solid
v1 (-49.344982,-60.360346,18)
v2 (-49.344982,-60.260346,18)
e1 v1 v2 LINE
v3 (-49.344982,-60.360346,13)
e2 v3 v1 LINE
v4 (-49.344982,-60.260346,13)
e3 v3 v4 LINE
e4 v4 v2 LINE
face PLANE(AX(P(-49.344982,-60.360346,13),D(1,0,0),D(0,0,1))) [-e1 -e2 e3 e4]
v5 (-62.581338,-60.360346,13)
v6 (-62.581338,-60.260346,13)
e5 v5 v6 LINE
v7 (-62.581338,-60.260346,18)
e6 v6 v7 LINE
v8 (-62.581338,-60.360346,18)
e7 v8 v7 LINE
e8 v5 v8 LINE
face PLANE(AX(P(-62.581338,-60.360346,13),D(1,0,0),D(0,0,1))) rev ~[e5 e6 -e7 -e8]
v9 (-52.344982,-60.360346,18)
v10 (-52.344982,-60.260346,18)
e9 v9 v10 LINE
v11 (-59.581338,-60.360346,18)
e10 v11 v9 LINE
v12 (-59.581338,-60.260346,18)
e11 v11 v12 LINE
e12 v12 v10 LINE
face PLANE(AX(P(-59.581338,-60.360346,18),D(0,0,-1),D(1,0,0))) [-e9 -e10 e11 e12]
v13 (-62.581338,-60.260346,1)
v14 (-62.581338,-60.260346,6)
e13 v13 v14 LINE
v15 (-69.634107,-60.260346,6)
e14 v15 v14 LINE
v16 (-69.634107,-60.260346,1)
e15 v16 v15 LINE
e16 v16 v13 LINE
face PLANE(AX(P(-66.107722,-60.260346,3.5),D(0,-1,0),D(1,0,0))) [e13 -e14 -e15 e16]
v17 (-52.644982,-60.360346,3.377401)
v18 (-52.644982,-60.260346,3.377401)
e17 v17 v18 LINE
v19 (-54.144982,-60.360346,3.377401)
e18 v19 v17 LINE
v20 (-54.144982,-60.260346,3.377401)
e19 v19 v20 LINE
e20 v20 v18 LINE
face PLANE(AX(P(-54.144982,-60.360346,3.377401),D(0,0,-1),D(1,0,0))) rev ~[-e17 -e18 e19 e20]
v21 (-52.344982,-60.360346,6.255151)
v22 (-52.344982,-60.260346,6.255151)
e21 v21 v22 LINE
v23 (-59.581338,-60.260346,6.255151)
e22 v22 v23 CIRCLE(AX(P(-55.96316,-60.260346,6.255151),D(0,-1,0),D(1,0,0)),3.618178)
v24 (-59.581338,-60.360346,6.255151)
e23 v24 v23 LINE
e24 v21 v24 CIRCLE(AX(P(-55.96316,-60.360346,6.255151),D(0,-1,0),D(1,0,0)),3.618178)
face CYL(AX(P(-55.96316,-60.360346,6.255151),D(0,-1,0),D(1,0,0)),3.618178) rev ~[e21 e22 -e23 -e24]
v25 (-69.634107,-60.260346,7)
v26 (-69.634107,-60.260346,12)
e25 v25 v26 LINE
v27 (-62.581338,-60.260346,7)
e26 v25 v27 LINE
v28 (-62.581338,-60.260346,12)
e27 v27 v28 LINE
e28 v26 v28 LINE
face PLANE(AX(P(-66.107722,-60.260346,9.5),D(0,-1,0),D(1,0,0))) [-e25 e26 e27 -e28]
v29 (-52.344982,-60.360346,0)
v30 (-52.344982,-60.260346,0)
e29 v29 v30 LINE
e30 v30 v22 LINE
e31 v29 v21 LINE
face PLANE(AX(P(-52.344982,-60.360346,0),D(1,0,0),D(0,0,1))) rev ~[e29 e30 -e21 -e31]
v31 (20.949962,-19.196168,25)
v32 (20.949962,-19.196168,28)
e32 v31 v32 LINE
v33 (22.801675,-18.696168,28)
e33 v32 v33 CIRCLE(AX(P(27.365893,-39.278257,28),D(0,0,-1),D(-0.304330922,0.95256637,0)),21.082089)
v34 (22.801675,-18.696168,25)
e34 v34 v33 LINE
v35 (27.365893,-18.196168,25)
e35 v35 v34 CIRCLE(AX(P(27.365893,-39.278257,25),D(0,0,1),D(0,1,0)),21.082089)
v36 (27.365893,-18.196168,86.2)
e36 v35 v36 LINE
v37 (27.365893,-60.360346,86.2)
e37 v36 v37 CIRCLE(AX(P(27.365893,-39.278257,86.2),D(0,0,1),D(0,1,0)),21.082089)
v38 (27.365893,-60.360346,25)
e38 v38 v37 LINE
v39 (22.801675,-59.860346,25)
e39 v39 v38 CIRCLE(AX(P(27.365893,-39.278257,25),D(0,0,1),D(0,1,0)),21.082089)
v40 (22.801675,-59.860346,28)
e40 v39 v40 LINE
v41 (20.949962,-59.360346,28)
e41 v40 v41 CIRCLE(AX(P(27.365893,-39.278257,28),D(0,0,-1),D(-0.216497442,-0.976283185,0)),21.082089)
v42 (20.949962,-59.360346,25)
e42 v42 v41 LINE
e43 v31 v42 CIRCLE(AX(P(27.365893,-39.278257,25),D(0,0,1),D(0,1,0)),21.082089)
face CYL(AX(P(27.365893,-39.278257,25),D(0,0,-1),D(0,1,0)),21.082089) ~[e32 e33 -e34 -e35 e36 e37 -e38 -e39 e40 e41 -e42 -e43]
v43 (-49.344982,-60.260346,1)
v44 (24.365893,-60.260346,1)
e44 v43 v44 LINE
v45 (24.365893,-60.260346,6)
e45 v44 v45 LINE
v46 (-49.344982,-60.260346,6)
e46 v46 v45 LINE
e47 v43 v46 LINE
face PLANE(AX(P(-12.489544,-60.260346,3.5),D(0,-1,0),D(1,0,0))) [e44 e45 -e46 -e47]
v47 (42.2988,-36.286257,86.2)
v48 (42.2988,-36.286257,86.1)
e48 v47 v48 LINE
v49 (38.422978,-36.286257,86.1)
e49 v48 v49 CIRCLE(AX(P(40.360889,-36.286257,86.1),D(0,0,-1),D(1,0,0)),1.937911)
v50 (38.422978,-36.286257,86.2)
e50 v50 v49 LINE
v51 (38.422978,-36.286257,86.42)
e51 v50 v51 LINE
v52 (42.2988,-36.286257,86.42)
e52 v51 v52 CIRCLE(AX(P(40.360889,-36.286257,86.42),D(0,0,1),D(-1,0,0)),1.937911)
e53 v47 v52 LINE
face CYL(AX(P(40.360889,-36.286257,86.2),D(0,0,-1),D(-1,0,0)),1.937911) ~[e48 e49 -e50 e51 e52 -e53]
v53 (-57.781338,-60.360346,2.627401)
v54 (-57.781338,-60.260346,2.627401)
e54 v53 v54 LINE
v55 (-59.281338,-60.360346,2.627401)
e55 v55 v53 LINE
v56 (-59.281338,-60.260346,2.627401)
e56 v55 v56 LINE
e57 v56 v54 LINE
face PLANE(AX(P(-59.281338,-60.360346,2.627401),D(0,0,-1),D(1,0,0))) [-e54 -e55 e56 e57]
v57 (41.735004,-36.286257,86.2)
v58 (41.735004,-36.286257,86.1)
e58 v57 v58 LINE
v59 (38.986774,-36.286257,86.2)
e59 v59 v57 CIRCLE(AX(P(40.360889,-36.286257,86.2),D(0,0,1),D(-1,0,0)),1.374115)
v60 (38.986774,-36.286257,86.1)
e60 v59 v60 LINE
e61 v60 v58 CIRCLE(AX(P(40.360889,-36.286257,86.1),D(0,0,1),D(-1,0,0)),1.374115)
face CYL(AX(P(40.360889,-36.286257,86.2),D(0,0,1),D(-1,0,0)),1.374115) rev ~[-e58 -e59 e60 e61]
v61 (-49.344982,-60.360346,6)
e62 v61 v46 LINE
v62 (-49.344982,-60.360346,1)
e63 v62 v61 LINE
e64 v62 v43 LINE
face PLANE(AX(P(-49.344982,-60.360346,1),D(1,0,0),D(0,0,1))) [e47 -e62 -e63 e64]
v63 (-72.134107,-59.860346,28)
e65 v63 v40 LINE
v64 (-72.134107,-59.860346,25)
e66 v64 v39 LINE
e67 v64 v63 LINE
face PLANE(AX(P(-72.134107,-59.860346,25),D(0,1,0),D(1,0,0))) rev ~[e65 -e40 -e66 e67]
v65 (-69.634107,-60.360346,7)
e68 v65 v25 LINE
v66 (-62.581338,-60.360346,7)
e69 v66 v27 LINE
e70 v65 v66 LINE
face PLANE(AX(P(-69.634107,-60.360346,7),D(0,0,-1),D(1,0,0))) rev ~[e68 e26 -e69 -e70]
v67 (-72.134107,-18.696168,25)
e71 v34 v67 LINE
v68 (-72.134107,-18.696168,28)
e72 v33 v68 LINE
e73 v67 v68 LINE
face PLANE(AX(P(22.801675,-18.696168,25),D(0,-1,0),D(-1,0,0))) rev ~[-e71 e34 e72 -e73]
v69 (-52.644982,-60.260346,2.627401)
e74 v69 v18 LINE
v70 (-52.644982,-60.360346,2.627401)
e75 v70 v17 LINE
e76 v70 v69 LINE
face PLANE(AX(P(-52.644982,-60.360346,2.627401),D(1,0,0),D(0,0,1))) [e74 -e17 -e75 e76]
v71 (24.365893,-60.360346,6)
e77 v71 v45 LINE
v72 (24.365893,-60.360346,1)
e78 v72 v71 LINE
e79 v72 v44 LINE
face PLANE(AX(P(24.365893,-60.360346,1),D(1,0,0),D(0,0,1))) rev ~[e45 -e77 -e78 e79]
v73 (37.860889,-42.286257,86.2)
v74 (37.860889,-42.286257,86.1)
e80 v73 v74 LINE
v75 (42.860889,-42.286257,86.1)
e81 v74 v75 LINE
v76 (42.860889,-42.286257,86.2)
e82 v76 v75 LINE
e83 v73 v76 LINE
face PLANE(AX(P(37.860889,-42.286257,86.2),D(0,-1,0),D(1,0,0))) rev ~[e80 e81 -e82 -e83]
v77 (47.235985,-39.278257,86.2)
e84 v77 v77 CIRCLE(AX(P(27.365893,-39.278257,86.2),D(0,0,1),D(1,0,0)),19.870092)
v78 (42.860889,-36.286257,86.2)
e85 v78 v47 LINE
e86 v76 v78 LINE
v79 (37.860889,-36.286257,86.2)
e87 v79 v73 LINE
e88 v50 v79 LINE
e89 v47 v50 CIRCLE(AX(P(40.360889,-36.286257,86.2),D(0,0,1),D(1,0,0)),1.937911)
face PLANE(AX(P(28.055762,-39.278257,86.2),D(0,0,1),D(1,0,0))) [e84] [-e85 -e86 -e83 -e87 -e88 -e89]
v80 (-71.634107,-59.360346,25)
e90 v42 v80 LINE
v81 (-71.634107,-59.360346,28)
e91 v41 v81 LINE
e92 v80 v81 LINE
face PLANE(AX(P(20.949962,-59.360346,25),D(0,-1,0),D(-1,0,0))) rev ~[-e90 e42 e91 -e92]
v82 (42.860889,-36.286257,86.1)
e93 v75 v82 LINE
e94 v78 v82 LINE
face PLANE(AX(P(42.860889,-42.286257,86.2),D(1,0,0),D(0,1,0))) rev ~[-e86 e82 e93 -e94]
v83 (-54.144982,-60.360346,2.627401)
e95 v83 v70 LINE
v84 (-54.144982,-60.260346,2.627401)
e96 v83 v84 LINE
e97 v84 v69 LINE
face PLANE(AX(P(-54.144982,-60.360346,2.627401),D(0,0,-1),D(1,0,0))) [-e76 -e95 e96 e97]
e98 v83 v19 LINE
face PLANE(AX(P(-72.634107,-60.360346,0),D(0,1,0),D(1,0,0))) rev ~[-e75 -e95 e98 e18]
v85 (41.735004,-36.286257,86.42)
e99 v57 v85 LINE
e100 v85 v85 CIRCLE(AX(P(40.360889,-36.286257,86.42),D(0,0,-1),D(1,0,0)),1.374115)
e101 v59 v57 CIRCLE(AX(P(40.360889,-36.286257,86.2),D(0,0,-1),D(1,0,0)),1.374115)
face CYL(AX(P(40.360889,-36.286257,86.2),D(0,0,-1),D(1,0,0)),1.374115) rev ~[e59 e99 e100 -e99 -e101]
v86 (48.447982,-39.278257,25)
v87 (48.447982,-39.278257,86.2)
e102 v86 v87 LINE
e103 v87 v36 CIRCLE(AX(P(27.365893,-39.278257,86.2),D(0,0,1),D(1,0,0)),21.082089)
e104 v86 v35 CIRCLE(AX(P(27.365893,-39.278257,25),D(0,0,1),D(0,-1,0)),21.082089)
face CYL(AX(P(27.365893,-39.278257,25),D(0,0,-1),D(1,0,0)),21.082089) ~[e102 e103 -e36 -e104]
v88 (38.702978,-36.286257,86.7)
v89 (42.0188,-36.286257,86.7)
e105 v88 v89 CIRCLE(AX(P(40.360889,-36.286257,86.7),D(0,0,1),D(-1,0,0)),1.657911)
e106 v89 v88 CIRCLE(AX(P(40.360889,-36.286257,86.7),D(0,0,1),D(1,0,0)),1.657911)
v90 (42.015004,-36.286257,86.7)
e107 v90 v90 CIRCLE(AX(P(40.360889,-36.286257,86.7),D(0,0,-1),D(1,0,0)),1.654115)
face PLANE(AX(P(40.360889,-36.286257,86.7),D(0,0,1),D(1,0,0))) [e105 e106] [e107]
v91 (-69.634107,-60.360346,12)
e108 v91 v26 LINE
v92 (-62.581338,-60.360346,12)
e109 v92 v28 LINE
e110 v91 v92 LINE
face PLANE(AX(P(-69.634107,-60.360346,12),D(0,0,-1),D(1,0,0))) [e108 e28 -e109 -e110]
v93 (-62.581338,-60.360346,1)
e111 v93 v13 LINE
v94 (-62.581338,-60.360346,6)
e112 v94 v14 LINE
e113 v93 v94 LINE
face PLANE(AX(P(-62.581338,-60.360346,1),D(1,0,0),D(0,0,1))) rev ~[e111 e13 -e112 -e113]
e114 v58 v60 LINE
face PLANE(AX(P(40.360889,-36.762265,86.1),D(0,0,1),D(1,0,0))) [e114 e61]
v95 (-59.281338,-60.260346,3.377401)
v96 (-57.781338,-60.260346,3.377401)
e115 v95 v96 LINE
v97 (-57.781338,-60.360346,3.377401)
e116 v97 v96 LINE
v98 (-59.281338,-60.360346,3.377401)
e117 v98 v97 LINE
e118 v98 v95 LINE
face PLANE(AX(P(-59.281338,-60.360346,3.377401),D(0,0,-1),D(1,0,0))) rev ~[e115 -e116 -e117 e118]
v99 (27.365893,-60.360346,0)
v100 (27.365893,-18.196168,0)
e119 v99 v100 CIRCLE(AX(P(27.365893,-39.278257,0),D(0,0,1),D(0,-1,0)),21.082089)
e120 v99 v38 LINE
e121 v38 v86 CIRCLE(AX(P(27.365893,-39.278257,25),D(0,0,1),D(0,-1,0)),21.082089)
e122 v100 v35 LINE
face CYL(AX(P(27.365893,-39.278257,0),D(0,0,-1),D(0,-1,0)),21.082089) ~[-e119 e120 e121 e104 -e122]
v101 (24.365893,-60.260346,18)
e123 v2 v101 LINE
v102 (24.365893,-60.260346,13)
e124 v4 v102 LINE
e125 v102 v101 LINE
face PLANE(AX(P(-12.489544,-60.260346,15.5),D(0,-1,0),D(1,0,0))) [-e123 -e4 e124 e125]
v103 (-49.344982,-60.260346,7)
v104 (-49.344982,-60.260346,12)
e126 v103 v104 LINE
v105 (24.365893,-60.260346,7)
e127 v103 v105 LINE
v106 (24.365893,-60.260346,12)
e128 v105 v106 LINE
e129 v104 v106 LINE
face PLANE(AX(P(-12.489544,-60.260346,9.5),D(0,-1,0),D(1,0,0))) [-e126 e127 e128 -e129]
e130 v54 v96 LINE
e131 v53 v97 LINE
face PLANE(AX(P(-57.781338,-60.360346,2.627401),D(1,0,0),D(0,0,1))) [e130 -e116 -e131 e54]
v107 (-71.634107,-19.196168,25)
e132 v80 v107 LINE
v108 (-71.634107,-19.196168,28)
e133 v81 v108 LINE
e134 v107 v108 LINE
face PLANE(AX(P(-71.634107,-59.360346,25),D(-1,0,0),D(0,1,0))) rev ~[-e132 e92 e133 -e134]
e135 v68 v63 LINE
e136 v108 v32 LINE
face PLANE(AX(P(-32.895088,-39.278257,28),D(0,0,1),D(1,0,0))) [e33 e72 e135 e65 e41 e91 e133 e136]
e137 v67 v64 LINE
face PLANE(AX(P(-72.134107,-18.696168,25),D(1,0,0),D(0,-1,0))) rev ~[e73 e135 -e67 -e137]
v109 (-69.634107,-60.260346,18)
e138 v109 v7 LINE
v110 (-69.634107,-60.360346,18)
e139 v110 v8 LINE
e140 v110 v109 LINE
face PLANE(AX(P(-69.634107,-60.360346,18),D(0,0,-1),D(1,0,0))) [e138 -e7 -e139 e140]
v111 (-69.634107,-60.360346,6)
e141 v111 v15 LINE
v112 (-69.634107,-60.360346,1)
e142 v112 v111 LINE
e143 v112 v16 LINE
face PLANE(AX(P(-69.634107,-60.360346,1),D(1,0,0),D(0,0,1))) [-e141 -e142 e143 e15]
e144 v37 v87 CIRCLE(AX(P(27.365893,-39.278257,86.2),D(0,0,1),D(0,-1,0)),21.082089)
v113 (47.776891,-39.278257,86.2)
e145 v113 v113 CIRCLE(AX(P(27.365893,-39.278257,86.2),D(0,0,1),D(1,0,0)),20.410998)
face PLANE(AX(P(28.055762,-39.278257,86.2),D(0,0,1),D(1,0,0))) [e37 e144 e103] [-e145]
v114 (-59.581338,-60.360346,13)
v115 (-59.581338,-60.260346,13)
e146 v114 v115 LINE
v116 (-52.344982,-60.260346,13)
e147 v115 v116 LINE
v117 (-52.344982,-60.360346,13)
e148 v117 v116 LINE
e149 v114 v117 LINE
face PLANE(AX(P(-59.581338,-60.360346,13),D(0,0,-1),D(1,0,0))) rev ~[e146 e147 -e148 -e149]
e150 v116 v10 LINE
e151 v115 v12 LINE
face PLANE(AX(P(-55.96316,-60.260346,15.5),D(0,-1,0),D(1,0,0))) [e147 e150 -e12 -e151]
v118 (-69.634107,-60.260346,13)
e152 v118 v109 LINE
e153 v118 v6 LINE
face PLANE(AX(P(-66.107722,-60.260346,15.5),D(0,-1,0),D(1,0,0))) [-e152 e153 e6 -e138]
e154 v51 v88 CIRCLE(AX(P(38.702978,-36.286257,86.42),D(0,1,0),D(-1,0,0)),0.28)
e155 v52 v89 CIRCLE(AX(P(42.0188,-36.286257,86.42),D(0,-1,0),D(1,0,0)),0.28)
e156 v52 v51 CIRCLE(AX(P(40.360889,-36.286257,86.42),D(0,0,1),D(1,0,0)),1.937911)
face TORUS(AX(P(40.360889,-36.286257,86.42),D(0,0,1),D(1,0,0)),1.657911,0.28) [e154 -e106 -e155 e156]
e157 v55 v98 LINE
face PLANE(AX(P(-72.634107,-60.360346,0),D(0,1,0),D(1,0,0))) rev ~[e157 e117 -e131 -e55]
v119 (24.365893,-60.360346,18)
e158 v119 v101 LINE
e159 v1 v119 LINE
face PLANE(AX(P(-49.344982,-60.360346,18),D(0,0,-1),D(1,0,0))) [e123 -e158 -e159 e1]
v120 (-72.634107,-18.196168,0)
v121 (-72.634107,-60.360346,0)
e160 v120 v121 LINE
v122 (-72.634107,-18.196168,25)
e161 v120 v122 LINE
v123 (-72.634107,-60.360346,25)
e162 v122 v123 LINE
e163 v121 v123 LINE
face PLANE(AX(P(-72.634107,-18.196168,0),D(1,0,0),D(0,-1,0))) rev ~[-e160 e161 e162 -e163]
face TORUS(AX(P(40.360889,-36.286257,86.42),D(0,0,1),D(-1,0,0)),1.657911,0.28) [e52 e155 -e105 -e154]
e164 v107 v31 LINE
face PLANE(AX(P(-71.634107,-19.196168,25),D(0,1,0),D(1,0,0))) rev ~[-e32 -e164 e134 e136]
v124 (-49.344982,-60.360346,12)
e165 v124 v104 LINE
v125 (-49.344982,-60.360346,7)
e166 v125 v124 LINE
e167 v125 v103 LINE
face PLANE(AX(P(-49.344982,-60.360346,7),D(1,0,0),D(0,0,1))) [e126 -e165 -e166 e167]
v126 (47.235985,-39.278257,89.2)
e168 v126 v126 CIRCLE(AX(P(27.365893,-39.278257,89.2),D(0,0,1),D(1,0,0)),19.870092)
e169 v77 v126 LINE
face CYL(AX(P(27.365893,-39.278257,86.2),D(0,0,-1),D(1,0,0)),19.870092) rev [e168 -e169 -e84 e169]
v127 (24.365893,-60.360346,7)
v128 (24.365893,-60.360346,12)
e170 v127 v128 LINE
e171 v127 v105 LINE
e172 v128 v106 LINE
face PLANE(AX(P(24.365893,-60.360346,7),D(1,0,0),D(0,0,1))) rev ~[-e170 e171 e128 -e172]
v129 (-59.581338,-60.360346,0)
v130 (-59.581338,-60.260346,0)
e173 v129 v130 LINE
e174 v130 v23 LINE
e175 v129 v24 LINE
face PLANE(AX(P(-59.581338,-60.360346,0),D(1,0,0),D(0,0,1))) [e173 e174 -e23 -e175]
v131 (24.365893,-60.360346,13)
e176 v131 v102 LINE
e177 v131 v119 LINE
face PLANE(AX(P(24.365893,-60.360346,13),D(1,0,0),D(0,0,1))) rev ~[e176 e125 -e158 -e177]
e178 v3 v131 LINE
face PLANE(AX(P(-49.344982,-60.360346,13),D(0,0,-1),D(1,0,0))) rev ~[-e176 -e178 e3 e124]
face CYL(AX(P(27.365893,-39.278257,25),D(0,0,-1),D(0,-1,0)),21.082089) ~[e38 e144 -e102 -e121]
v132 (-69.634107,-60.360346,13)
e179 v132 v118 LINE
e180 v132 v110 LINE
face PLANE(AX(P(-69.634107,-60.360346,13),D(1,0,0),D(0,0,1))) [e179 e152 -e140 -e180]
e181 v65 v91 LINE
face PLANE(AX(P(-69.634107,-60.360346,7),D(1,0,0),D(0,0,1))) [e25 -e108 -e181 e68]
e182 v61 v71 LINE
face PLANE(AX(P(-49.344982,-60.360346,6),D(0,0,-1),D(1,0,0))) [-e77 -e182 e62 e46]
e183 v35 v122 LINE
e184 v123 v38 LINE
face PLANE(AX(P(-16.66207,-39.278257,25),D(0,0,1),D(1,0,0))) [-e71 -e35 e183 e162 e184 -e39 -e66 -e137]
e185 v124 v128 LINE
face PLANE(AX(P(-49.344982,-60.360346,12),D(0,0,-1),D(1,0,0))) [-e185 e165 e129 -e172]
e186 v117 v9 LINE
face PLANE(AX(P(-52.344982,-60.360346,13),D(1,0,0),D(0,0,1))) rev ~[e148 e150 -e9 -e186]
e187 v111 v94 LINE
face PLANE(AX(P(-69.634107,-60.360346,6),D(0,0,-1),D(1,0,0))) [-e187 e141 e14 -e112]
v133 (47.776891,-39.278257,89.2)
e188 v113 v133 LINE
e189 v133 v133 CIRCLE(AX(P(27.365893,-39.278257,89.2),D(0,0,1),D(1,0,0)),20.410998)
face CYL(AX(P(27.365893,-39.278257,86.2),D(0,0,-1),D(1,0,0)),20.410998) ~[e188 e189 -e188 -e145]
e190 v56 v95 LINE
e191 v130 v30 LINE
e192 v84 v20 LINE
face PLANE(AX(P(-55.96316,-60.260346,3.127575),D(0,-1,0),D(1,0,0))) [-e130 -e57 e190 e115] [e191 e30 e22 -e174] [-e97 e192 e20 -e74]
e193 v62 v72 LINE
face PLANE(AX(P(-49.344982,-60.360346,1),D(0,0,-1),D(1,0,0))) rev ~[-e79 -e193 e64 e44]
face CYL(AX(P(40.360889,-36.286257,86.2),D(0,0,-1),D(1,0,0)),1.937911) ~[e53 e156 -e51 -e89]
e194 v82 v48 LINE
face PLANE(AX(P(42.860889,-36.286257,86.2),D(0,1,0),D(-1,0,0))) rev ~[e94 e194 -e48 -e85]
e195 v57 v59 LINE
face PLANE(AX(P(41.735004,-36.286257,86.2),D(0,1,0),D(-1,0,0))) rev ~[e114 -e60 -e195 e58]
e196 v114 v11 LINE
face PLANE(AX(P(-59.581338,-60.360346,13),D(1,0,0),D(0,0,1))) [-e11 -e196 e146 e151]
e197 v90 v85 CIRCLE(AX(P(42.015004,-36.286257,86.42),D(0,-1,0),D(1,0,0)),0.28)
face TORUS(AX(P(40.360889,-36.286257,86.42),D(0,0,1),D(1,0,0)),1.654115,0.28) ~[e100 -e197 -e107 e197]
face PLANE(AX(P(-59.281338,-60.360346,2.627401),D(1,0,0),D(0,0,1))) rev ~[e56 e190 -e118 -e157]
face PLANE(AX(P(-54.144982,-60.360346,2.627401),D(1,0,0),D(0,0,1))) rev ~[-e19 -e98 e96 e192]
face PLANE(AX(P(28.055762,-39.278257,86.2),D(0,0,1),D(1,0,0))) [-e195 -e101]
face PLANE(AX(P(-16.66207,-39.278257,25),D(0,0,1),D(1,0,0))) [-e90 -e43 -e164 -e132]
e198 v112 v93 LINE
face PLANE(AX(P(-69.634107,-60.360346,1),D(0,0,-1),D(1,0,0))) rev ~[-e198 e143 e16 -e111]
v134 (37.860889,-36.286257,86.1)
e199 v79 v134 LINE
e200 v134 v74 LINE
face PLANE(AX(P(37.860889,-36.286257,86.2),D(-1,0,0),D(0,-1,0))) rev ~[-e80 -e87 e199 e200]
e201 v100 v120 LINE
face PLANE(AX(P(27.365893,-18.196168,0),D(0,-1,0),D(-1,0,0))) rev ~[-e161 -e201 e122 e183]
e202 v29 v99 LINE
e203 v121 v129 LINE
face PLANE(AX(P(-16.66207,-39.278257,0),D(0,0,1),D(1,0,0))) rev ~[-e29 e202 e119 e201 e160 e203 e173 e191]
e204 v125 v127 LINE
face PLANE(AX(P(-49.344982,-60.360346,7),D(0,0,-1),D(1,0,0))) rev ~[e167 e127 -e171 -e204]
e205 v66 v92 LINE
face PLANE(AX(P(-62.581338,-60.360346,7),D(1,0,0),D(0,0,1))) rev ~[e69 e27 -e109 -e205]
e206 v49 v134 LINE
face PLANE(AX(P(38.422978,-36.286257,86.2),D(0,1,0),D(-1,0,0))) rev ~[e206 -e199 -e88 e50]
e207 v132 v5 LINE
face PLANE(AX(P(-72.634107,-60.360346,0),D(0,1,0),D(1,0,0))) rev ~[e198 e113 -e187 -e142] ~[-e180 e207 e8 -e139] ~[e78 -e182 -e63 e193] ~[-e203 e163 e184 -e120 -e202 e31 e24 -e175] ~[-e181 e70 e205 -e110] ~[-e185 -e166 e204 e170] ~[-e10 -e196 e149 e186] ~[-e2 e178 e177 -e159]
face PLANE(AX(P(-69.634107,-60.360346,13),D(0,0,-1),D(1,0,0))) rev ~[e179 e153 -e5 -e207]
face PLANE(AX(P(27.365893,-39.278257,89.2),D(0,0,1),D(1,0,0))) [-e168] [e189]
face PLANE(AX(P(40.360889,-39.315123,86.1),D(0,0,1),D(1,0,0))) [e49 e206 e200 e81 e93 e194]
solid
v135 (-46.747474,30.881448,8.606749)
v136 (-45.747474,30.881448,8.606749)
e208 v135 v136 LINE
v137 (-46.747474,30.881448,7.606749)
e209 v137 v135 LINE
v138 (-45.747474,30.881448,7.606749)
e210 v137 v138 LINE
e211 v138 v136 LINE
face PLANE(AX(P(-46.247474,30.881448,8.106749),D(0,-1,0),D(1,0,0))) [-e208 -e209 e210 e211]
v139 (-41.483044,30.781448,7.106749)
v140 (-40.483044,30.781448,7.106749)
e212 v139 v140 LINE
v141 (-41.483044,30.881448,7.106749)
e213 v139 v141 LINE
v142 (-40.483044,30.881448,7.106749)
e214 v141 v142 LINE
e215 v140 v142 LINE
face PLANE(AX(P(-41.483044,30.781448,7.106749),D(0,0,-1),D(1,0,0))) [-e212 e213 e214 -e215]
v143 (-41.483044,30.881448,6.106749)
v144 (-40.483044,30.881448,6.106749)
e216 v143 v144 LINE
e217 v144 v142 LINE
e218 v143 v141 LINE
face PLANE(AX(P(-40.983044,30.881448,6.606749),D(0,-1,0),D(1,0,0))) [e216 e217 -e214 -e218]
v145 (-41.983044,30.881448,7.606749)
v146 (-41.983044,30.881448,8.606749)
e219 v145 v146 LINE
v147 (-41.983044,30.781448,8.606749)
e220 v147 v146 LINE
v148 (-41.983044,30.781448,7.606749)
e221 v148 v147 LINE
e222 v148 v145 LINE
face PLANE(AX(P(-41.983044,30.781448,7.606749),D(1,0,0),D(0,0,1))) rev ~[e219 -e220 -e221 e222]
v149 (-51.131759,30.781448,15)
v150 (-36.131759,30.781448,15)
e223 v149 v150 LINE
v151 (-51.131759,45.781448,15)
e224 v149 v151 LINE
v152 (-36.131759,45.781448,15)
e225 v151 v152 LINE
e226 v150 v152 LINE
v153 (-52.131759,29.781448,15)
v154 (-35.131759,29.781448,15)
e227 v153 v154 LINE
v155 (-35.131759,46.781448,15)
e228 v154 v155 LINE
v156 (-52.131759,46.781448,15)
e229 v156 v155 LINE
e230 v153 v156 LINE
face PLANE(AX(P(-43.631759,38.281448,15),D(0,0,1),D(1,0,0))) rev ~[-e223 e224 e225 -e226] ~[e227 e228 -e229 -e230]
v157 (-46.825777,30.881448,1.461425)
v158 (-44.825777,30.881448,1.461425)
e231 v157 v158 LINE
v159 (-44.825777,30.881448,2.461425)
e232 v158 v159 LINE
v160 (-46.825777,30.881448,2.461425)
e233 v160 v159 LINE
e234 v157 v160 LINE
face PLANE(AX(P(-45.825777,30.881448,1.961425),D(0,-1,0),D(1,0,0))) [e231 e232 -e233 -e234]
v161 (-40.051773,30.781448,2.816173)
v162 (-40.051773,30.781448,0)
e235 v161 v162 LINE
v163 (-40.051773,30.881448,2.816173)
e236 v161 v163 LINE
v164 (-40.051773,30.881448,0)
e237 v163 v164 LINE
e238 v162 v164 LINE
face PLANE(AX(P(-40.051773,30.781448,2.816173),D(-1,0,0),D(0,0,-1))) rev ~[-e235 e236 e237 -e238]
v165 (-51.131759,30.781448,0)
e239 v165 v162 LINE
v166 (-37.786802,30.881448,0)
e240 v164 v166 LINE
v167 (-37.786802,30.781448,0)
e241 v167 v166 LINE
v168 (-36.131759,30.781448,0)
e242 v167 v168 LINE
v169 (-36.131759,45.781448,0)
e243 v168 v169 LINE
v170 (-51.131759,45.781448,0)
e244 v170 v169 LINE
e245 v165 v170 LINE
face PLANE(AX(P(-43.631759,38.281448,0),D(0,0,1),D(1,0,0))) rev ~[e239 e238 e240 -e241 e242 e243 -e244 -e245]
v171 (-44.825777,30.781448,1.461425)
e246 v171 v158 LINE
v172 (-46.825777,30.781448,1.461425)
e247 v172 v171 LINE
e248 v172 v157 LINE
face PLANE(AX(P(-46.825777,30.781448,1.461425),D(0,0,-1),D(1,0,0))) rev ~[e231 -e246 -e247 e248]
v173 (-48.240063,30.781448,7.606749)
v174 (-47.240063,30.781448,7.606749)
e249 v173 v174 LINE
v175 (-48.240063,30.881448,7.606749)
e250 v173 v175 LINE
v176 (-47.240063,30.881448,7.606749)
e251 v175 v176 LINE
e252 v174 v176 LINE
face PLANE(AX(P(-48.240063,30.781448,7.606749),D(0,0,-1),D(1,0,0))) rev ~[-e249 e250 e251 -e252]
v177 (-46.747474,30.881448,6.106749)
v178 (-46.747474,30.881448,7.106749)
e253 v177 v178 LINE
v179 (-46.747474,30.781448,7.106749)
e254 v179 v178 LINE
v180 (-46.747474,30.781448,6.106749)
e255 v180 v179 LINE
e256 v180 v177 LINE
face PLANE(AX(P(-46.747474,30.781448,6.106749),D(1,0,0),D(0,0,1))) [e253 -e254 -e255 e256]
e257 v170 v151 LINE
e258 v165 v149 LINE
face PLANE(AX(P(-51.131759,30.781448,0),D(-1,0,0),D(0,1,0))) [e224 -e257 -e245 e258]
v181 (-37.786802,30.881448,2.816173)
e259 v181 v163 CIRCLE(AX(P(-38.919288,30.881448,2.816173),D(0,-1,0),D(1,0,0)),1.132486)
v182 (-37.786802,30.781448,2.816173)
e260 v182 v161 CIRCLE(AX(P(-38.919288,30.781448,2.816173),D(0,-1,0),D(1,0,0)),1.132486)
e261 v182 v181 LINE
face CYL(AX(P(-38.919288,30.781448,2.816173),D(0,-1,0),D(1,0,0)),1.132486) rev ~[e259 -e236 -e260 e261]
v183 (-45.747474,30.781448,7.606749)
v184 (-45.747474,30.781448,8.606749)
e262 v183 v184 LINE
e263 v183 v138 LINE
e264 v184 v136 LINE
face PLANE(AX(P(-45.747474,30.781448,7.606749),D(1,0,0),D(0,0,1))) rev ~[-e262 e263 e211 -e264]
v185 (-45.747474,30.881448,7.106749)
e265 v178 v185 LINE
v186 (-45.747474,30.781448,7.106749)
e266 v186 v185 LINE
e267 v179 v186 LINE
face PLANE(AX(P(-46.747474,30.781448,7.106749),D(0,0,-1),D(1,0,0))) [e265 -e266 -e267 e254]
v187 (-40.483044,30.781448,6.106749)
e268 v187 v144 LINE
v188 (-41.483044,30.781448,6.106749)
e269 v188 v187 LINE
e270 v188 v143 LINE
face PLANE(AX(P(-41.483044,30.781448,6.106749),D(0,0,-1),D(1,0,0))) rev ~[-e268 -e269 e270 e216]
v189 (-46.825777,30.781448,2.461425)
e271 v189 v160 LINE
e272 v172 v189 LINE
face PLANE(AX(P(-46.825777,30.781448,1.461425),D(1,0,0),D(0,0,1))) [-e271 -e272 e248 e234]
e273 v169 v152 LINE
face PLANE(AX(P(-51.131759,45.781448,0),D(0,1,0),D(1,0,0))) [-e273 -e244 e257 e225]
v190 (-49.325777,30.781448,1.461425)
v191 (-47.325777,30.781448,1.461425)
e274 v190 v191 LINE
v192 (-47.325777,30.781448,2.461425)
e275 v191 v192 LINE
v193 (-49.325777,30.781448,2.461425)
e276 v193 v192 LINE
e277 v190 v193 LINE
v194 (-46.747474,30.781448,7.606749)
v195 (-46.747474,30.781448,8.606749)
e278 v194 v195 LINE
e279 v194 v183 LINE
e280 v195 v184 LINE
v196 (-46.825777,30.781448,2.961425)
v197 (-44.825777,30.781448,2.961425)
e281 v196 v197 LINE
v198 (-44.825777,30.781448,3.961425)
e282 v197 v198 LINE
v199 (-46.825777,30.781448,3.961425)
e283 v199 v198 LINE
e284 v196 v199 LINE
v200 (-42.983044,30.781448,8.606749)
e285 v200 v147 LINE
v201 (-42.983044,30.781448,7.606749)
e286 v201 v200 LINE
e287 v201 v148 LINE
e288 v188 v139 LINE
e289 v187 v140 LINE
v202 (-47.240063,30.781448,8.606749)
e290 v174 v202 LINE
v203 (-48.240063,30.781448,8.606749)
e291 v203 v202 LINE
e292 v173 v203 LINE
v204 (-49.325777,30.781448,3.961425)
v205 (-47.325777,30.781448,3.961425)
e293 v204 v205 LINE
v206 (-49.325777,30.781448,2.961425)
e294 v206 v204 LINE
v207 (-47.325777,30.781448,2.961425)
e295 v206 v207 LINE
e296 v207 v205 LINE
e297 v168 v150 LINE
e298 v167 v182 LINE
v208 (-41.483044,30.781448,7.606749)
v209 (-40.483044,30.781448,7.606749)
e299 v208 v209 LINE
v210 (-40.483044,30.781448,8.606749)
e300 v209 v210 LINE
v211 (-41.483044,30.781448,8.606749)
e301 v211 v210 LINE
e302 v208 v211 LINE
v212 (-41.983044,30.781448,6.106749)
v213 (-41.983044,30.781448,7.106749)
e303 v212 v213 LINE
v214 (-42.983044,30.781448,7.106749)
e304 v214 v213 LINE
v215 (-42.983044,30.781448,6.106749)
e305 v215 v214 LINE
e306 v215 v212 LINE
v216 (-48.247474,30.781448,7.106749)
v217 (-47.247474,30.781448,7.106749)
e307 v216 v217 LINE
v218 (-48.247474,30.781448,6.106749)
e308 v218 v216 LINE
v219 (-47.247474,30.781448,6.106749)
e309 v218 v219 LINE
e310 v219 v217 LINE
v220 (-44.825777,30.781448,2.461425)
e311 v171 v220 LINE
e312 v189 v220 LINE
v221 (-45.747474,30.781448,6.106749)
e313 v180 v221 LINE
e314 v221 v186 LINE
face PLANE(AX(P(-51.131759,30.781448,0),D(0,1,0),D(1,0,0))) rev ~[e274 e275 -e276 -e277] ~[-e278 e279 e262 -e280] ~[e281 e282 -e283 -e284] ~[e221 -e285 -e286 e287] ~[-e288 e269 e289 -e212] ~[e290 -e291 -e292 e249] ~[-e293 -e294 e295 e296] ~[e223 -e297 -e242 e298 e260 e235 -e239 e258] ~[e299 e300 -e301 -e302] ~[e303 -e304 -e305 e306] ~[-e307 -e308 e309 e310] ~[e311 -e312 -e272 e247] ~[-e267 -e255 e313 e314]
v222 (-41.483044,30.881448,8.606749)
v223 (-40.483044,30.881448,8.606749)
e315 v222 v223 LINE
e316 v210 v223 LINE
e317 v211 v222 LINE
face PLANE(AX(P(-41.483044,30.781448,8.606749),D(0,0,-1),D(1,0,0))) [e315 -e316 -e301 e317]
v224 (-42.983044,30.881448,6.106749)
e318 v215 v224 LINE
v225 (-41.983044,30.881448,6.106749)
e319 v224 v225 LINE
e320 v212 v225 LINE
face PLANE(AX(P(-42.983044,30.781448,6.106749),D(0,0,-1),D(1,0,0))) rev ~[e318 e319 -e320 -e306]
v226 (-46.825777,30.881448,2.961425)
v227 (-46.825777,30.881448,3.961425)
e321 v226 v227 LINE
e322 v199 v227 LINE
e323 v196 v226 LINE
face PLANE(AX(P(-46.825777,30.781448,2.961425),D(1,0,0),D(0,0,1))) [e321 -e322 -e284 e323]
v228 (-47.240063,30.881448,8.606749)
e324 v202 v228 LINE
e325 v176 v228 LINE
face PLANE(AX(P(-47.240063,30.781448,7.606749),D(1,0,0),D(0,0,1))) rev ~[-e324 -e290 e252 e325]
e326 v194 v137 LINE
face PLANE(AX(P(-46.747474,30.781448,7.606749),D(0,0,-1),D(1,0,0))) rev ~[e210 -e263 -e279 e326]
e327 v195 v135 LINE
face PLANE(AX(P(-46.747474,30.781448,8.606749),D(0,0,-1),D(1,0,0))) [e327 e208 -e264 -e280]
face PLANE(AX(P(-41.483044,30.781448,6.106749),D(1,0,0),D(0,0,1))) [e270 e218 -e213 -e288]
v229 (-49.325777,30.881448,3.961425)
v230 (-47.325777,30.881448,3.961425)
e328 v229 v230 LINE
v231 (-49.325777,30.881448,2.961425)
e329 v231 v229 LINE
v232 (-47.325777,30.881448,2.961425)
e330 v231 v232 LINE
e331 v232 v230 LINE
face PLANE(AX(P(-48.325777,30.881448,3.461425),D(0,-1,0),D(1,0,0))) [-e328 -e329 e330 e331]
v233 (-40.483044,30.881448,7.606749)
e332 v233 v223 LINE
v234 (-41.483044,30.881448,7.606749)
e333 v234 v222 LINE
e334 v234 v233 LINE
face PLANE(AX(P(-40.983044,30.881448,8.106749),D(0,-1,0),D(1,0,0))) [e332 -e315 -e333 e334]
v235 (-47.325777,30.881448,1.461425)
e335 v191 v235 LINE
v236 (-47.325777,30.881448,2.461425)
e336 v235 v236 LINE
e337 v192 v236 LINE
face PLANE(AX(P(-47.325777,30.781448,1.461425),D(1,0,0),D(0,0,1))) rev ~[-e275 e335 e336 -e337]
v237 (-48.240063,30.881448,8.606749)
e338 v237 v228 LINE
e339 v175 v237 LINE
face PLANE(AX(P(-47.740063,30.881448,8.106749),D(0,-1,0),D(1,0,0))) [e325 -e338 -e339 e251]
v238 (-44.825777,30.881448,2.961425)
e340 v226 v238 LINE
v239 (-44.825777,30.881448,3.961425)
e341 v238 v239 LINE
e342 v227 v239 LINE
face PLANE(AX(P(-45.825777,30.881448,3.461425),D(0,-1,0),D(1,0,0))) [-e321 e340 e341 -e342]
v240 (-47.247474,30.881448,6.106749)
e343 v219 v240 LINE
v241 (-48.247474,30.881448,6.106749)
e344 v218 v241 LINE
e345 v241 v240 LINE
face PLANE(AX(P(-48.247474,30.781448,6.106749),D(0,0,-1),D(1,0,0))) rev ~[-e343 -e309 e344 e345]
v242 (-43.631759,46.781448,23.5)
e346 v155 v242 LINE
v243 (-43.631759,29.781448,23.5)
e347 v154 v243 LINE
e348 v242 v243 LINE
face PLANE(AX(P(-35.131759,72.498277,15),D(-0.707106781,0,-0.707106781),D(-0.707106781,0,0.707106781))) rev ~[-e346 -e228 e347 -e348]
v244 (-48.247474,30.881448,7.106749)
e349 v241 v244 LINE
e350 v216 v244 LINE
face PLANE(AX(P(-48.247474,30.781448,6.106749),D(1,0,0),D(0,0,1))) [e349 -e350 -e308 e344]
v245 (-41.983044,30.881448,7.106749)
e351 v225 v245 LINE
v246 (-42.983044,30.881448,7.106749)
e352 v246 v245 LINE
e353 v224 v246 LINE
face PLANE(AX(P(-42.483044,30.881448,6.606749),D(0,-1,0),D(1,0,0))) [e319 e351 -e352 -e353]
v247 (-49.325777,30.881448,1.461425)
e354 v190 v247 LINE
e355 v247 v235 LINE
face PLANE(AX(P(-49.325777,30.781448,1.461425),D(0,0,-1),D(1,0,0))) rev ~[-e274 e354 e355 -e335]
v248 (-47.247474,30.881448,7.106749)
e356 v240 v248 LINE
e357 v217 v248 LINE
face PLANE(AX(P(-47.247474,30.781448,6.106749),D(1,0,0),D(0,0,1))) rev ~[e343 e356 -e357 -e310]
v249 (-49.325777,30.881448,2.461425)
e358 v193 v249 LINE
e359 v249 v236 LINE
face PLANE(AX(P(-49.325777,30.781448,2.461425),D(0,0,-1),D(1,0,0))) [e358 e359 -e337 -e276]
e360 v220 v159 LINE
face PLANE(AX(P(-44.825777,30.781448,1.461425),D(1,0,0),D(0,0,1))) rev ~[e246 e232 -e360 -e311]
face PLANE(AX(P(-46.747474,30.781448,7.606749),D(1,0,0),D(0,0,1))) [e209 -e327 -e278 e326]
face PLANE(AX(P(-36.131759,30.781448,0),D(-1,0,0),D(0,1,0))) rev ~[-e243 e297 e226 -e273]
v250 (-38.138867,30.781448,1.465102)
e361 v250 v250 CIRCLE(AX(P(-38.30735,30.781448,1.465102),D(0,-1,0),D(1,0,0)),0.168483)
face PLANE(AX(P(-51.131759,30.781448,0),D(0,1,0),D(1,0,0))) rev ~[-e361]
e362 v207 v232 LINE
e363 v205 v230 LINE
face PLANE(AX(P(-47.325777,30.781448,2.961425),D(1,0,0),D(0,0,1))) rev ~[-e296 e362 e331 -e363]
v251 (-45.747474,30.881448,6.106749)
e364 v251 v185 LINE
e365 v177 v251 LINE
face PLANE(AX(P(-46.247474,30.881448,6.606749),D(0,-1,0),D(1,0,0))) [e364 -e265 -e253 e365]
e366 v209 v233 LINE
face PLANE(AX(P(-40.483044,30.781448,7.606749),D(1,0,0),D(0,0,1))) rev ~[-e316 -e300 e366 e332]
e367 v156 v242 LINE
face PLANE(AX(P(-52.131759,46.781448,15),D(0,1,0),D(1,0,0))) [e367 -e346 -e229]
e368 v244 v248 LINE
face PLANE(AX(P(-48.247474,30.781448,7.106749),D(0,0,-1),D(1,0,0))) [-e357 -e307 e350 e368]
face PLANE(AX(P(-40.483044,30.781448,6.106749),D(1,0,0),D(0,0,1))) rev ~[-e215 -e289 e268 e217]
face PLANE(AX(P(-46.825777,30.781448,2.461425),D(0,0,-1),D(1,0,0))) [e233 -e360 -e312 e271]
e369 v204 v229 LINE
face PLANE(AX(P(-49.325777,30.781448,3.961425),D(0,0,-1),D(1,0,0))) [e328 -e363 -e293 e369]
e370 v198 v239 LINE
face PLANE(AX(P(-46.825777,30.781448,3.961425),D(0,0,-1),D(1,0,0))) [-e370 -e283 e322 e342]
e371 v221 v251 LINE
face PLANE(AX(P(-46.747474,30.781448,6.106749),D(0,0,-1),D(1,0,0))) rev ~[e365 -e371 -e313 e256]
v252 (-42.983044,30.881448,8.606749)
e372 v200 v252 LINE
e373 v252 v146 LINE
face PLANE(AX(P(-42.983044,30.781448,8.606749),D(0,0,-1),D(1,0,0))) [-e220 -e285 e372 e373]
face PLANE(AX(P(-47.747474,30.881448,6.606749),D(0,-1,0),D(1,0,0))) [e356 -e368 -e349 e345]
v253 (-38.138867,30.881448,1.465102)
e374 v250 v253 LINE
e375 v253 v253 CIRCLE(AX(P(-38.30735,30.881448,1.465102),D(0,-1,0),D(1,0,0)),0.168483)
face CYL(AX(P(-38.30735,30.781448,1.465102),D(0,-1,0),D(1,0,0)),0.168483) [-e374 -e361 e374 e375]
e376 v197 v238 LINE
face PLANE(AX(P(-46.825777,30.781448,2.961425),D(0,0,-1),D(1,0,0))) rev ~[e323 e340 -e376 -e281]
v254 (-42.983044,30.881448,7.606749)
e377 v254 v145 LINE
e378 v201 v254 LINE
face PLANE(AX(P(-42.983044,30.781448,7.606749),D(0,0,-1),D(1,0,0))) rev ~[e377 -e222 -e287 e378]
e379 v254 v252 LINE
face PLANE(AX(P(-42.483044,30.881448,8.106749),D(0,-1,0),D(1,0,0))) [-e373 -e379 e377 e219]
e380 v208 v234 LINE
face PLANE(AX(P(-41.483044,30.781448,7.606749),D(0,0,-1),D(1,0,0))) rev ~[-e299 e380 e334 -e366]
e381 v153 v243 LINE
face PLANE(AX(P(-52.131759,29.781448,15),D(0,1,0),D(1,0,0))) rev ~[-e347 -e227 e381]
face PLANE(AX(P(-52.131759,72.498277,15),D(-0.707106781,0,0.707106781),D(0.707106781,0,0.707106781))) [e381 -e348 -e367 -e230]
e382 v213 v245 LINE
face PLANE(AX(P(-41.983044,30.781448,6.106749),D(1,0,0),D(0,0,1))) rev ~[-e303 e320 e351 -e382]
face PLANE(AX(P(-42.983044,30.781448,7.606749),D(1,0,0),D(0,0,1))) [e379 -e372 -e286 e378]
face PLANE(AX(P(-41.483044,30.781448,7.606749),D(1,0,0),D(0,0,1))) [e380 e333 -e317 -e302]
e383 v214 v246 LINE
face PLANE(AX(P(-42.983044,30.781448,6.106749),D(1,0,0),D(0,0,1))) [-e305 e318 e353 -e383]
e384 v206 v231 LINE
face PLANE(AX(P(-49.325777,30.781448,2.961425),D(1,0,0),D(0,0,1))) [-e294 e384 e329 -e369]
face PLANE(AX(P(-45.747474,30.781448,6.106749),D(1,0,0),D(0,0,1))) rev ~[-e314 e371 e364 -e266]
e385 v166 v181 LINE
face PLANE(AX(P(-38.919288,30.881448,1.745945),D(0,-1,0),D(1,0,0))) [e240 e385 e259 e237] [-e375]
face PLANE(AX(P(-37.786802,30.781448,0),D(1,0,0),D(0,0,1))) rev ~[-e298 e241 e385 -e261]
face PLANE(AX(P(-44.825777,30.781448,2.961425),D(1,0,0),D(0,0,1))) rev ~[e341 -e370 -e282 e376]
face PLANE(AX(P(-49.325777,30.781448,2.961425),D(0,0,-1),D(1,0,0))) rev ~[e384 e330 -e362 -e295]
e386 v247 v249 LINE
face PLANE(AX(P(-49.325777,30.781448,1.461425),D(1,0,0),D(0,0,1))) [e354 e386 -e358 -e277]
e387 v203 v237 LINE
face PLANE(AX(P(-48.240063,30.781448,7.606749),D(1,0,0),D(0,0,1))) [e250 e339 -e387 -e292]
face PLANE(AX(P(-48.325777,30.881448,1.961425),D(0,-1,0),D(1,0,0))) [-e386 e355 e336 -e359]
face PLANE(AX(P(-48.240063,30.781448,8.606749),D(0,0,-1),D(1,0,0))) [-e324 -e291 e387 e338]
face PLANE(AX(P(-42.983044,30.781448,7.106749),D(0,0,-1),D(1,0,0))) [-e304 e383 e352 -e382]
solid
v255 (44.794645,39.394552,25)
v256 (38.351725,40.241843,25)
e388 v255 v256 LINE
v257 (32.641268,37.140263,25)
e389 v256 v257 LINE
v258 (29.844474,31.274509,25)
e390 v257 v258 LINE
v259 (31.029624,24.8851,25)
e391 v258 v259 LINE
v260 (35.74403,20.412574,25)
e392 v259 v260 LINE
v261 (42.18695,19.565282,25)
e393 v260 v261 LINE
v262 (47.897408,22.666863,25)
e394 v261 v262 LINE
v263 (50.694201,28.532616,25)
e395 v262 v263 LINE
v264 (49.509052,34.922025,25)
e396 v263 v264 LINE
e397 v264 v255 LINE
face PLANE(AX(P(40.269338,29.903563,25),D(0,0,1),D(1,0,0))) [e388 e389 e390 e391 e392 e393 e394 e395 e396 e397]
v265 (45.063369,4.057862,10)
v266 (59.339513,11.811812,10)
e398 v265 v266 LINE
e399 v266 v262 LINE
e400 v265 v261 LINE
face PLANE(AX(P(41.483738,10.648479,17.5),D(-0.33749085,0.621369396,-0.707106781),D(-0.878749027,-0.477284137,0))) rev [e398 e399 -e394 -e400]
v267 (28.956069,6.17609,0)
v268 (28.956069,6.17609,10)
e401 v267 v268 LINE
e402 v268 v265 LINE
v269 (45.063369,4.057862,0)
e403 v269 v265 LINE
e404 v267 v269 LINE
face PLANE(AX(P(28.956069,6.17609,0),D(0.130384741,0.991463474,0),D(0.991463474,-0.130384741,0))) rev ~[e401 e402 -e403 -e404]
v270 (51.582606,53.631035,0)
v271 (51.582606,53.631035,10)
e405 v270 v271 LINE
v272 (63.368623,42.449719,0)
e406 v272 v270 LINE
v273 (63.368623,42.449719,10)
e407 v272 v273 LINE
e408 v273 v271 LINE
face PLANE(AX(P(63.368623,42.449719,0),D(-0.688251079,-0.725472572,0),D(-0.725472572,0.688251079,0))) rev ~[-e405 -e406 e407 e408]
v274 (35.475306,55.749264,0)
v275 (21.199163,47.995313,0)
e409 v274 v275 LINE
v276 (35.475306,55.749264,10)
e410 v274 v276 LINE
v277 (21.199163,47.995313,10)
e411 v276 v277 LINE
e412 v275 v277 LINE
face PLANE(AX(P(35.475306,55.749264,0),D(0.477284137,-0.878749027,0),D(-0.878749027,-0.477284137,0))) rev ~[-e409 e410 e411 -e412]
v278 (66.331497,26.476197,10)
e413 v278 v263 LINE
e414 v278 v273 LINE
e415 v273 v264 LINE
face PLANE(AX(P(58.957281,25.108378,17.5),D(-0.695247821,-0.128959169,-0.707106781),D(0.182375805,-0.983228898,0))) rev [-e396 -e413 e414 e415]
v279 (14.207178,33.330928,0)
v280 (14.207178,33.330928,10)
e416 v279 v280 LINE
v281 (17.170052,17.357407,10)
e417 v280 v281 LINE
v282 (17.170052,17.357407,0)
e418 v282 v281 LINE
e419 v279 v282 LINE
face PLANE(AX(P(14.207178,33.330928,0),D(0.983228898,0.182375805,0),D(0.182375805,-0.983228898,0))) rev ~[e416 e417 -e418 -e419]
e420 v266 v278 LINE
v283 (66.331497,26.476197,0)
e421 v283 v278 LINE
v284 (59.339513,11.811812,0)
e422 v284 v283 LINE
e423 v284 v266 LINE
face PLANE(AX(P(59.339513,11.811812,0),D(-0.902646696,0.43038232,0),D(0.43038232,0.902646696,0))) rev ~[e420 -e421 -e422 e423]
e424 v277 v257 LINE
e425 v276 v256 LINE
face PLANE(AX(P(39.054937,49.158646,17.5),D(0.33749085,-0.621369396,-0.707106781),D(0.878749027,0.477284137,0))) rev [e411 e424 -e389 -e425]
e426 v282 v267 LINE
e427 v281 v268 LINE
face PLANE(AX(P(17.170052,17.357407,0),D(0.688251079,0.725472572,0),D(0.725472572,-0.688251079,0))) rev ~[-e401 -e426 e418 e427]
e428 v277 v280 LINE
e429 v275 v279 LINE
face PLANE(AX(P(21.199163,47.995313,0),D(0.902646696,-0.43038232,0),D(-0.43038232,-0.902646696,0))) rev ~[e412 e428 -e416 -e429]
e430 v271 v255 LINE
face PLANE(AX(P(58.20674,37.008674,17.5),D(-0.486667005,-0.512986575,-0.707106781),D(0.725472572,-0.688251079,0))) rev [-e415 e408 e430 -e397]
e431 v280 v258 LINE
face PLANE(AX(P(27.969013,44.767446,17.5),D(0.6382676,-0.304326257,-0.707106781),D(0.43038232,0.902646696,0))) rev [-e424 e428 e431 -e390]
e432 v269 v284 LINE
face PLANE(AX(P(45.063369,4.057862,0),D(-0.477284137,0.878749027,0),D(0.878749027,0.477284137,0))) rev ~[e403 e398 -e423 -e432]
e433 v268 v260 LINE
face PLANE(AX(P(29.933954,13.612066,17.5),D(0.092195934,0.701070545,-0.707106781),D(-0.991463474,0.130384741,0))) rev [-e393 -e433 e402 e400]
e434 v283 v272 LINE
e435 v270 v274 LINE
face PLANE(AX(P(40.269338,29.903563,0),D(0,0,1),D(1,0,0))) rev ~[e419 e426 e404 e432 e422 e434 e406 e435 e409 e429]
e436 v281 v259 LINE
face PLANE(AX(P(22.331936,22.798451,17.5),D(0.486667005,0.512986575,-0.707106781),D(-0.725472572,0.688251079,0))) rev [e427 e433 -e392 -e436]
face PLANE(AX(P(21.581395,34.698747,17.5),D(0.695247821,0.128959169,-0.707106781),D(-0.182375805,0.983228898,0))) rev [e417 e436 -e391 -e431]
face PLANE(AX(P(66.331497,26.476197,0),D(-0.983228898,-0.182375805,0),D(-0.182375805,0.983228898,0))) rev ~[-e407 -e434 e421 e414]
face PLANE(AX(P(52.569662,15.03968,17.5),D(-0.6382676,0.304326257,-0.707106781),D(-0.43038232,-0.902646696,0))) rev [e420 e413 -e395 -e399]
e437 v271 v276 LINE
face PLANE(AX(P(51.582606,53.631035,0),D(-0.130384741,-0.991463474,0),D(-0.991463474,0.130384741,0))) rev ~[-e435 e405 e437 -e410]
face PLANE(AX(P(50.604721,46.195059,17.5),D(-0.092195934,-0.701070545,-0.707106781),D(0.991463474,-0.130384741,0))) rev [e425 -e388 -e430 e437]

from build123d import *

# Parameters (mm, degrees)
F0_W        = 15
F0_H        = 15
F1_DEPTH    = 15
F2_W        = 2
F2_H        = 1
F2_W_2      = 1
F2_R        = 0.1684831901
F3_DEPTH    = 0.1
F4_W        = 17
F4_H        = 17
F4_W_2      = 15
F4_H_2      = 15
F5_DEPTH    = 10
F6_T1_DEPTH = 68.4336597593
F8_DEPTH    = 25
F10_DEPTH   = 61.2
F11_W       = 7.2363563826
F11_H       = 6.2551509271
F11_W_2     = 1.5
F11_H_2     = 0.75
F12_DEPTH   = 0.1
F13_R       = 20.4109975869
F13_R_2     = 19.8700915576
F14_DEPTH   = 3
F16_DEPTH   = 0.1
F18_DEPTH   = 0.5
F19_R       = 0.28
F20_W       = 7.0527685629
F20_H       = 5
F20_W_2     = 7.2363563826
F20_W_3     = 73.7108750545
F21_DEPTH   = 0.1
F23_DEPTH   = 3
F25_DEPTH   = 25
F26_SIZE    = 15


# Not quite as in the source:
# - a fillet or chamfer that OpenCascade refuses, or shapes differently, is made with other operations: its cross-section is extruded or revolved along the edge and cut away or added


with BuildPart() as f1:
    # F0 (on Top) → F1 (new body)
    with BuildSketch(Plane.XY):
        with Locations((-43.6317585409, 38.2814475718)):
            Rectangle(F0_W, F0_H)
    extrude(amount=F1_DEPTH)

    # F2 (on face) → F3 (cut)
    with BuildSketch(Plane.XZ.offset(-30.7814475718)):
        with Locations((-45.825777228, 3.4614248428)):
            Rectangle(F2_W, F2_H)
        with Locations((-48.325777228, 1.9614248428)):
            Rectangle(F2_W, F2_H)
        with Locations((-45.825777228, 1.9614248428)):
            Rectangle(F2_W, F2_H)
        with Locations((-47.7474738359, 6.606749177)):
            Rectangle(F2_W_2, F2_H)
        with Locations((-46.2474738359, 6.606749177)):
            Rectangle(F2_W_2, F2_H)
        with Locations((-47.7400628534, 8.106749177)):
            Rectangle(F2_W_2, F2_H)
        with Locations((-46.2474738359, 8.106749177)):
            Rectangle(F2_W_2, F2_H)
        with Locations((-40.9830439389, 8.106749177)):
            Rectangle(F2_W_2, F2_H)
        with Locations((-42.4830439389, 6.606749177)):
            Rectangle(F2_W_2, F2_H)
        with Locations((-40.9830439389, 6.606749177)):
            Rectangle(F2_W_2, F2_H)
        with BuildLine():
            ThreePointArc((-37.7868020667, 2.8161734808), (-38.9192876286, 3.9486590427), (-40.0517731905, 2.8161734808))
            Line((-40.0517731905, 2.8161734808), (-40.0517731905, 0))
            Line((-40.0517731905, 0), (-37.7868020667, 0))
            Line((-37.7868020667, 0), (-37.7868020667, 2.8161734808))
        make_face()
        with Locations((-38.3073501289, 1.4651020756)):
            Circle(F2_R, mode=Mode.SUBTRACT)
        with Locations((-48.325777228, 3.4614248428)):
            Rectangle(F2_W, F2_H)
        with Locations((-42.4830439389, 8.106749177)):
            Rectangle(F2_W_2, F2_H)
    extrude(amount=-F3_DEPTH, mode=Mode.SUBTRACT)

    # F4 (on face) → F5 (join)
    with BuildSketch(Plane.XY.offset(15)):
        with Locations((-43.6317585409, 38.2814475718)):
            Rectangle(F4_W, F4_H)
        with Locations((-43.6317585409, 38.2814475718)):
            Rectangle(F4_W_2, F4_H_2, mode=Mode.SUBTRACT)
        with Locations((-43.6317585409, 38.2814475718)):
            Rectangle(F4_W_2, F4_H_2)
    extrude(amount=F5_DEPTH)

    # F6: chamfer of 10 on 2 edges, made by hand

    # F6_s2 → F6_t1 (cut)
    with BuildSketch(Plane.XZ.offset(-72.4982774515)):
        Polygon((-52.1317585409, 15), (-42.1317585409, 25), (-52.1317585409, 25), align=None)
        Polygon((-35.1317585409, 15), (-45.1317585409, 25), (-35.1317585409, 25), align=None)
    extrude(amount=F6_T1_DEPTH, mode=Mode.SUBTRACT)


with BuildPart() as f8:
    # F7 (on Top) → F8 (new body)
    with BuildSketch(Plane.XY):
        with BuildLine():
            Line((27.3658934735, -18.1961677477), (-72.6341065265, -18.1961677477))
            Line((-72.6341065265, -18.1961677477), (-72.6341065265, -60.360345666))
            Line((-72.6341065265, -60.360345666), (27.3658934735, -60.360345666))
            ThreePointArc((27.3658934735, -60.360345666), (48.4479824327, -39.2782567069), (27.3658934735, -18.1961677477))
        make_face()
    extrude(amount=F8_DEPTH)

    # F9 (on face) → F10 (join)
    with BuildSketch(Plane.XY.offset(25)):
        with BuildLine():
            ThreePointArc((27.3658934735, -60.360345666), (42.2731815381, -54.1855447715), (48.4479824327, -39.2782567069))
            ThreePointArc((48.4479824327, -39.2782567069), (42.2731815381, -24.3709686423), (27.3658934735, -18.1961677477))
            ThreePointArc((27.3658934735, -18.1961677477), (6.2838045144, -39.2782567069), (27.3658934735, -60.360345666))
        make_face()
    extrude(amount=F10_DEPTH)

    # F11 (on face) → F12 (cut)
    with BuildSketch(Plane.XZ.offset(60.360345666)):
        with Locations((-55.9631597723, 3.1275754635)):
            Rectangle(F11_W, F11_H)
        with Locations((-58.5313379636, 3.0024008358)):
            Rectangle(F11_W_2, F11_H_2, mode=Mode.SUBTRACT)
        with Locations((-53.394981581, 3.0024008358)):
            Rectangle(F11_W_2, F11_H_2, mode=Mode.SUBTRACT)
        with BuildLine():
            ThreePointArc((-52.344981581, 6.2551509271), (-55.9631597723, 9.8733291184), (-59.5813379636, 6.2551509271))
            Line((-59.5813379636, 6.2551509271), (-52.344981581, 6.2551509271))
        make_face()
    extrude(amount=-F12_DEPTH, mode=Mode.SUBTRACT)

    # F13 (on face) → F14 (join)
    with BuildSketch(Plane.XY.offset(86.2)):
        with Locations((27.3658934735, -39.2782567069)):
            Circle(F13_R)
        with Locations((27.3658934735, -39.2782567069)):
            Circle(F13_R_2, mode=Mode.SUBTRACT)
    extrude(amount=F14_DEPTH)

    # F15 (on face) → F16 (cut)
    with BuildSketch(Plane.XY.offset(86.2)):
        with BuildLine():
            ThreePointArc((38.9867735619, -36.2862572074), (40.3608889878, -37.6603726333), (41.7350044137, -36.2862572074))
            Line((41.7350044137, -36.2862572074), (38.9867735619, -36.2862572074))
        make_face()
        with BuildLine():
            Line((42.8608889878, -36.2862572074), (42.2988002924, -36.2862572074))
            ThreePointArc((42.2988002924, -36.2862572074), (40.3608889878, -38.2241685121), (38.4229776831, -36.2862572074))
            Line((38.4229776831, -36.2862572074), (37.8608889878, -36.2862572074))
            Line((37.8608889878, -36.2862572074), (37.8608889878, -42.2862572074))
            Line((37.8608889878, -42.2862572074), (42.8608889878, -42.2862572074))
            Line((42.8608889878, -42.2862572074), (42.8608889878, -36.2862572074))
        make_face()
    extrude(amount=-F16_DEPTH, mode=Mode.SUBTRACT)

    # F17 (on face) → F18 (join)
    with BuildSketch(Plane.XY.offset(86.2)):
        with BuildLine():
            ThreePointArc((38.4229776831, -36.2862572074), (40.3608889878, -38.2241685121), (42.2988002924, -36.2862572074))
            ThreePointArc((42.2988002924, -36.2862572074), (40.3608889878, -34.3483459027), (38.4229776831, -36.2862572074))
        make_face()
        with BuildLine():
            ThreePointArc((38.9867735619, -36.2862572074), (40.3608889878, -34.9121417815), (41.7350044137, -36.2862572074))
            ThreePointArc((41.7350044137, -36.2862572074), (40.3608889878, -37.6603726333), (38.9867735619, -36.2862572074))
        make_face(mode=Mode.SUBTRACT)
    extrude(amount=F18_DEPTH)

    # F19
    f19_edges = [f8.edges().sort_by_distance(p)[0] for p in [
        (42.2988, -36.286257, 86.7),
        (41.735004, -36.286257, 86.7),
    ]]
    fillet(f19_edges, radius=F19_R)

    # F20 (on face) → F21 (cut)
    with BuildSketch(Plane.XZ.offset(60.360345666)):
        with Locations((-66.107722245, 3.5)):
            Rectangle(F20_W, F20_H)
        with Locations((-66.107722245, 9.5)):
            Rectangle(F20_W, F20_H)
        with Locations((-66.107722245, 15.5)):
            Rectangle(F20_W, F20_H)
        with Locations((-55.9631597723, 15.5)):
            Rectangle(F20_W_2, F20_H)
        with Locations((-12.4895440537, 15.5)):
            Rectangle(F20_W_3, F20_H)
        with Locations((-12.4895440537, 9.5)):
            Rectangle(F20_W_3, F20_H)
        with Locations((-12.4895440537, 3.5)):
            Rectangle(F20_W_3, F20_H)
    extrude(amount=-F21_DEPTH, mode=Mode.SUBTRACT)

    # F22 (on face) → F23 (join)
    with BuildSketch(Plane.XY.offset(25)):
        with BuildLine():
            Line((22.801675144, -18.6961677477), (-72.1341065265, -18.6961677477))
            Line((-72.1341065265, -18.6961677477), (-72.1341065265, -59.860345666))
            Line((-72.1341065265, -59.860345666), (22.801675144, -59.860345666))
            ThreePointArc((22.801675144, -59.860345666), (21.8701293813, -59.6314149858), (20.9499619029, -59.360345666))
            Line((20.9499619029, -59.360345666), (-71.6341065265, -59.360345666))
            Line((-71.6341065265, -59.360345666), (-71.6341065265, -19.1961677477))
            Line((-71.6341065265, -19.1961677477), (20.9499619029, -19.1961677477))
            ThreePointArc((20.9499619029, -19.1961677477), (21.8701293813, -18.925098428), (22.801675144, -18.6961677477))
        make_face()
    extrude(amount=F23_DEPTH)


with BuildPart() as f25:
    # F24 (on Top) → F25 (new body)
    with BuildSketch(Plane.XY):
        Polygon((51.5826063814, 53.6310353183), (35.4753058491, 55.7492638375), (21.1991625003, 47.9953130003), (14.2071778661, 33.3309284795), (17.1700524279, 17.3574067378), (28.9560688076, 6.1760901607), (45.06336934, 4.0578616415), (59.3395126887, 11.8118124787), (66.3314973229, 26.4761969995), (63.3686227611, 42.4497187412), align=None)
    extrude(amount=F25_DEPTH)

    # F26
    f26_edges = [f25.edges().sort_by_distance(p)[0] for p in [
        (62.835505, 19.144005, 25),
        (64.85006, 34.462958, 25),
        (57.475615, 48.040377, 25),
        (43.528956, 54.69015, 25),
        (28.337234, 51.872288, 25),
        (17.70317, 40.663121, 25),
        (23.063061, 11.766748, 25),
        (37.009719, 5.116976, 25),
        (52.201441, 7.934837, 25),
        (15.688615, 25.344168, 25),
    ]]
    chamfer(f26_edges, length=F26_SIZE)


solid = Compound([f1.part, f8.part, f25.part])
